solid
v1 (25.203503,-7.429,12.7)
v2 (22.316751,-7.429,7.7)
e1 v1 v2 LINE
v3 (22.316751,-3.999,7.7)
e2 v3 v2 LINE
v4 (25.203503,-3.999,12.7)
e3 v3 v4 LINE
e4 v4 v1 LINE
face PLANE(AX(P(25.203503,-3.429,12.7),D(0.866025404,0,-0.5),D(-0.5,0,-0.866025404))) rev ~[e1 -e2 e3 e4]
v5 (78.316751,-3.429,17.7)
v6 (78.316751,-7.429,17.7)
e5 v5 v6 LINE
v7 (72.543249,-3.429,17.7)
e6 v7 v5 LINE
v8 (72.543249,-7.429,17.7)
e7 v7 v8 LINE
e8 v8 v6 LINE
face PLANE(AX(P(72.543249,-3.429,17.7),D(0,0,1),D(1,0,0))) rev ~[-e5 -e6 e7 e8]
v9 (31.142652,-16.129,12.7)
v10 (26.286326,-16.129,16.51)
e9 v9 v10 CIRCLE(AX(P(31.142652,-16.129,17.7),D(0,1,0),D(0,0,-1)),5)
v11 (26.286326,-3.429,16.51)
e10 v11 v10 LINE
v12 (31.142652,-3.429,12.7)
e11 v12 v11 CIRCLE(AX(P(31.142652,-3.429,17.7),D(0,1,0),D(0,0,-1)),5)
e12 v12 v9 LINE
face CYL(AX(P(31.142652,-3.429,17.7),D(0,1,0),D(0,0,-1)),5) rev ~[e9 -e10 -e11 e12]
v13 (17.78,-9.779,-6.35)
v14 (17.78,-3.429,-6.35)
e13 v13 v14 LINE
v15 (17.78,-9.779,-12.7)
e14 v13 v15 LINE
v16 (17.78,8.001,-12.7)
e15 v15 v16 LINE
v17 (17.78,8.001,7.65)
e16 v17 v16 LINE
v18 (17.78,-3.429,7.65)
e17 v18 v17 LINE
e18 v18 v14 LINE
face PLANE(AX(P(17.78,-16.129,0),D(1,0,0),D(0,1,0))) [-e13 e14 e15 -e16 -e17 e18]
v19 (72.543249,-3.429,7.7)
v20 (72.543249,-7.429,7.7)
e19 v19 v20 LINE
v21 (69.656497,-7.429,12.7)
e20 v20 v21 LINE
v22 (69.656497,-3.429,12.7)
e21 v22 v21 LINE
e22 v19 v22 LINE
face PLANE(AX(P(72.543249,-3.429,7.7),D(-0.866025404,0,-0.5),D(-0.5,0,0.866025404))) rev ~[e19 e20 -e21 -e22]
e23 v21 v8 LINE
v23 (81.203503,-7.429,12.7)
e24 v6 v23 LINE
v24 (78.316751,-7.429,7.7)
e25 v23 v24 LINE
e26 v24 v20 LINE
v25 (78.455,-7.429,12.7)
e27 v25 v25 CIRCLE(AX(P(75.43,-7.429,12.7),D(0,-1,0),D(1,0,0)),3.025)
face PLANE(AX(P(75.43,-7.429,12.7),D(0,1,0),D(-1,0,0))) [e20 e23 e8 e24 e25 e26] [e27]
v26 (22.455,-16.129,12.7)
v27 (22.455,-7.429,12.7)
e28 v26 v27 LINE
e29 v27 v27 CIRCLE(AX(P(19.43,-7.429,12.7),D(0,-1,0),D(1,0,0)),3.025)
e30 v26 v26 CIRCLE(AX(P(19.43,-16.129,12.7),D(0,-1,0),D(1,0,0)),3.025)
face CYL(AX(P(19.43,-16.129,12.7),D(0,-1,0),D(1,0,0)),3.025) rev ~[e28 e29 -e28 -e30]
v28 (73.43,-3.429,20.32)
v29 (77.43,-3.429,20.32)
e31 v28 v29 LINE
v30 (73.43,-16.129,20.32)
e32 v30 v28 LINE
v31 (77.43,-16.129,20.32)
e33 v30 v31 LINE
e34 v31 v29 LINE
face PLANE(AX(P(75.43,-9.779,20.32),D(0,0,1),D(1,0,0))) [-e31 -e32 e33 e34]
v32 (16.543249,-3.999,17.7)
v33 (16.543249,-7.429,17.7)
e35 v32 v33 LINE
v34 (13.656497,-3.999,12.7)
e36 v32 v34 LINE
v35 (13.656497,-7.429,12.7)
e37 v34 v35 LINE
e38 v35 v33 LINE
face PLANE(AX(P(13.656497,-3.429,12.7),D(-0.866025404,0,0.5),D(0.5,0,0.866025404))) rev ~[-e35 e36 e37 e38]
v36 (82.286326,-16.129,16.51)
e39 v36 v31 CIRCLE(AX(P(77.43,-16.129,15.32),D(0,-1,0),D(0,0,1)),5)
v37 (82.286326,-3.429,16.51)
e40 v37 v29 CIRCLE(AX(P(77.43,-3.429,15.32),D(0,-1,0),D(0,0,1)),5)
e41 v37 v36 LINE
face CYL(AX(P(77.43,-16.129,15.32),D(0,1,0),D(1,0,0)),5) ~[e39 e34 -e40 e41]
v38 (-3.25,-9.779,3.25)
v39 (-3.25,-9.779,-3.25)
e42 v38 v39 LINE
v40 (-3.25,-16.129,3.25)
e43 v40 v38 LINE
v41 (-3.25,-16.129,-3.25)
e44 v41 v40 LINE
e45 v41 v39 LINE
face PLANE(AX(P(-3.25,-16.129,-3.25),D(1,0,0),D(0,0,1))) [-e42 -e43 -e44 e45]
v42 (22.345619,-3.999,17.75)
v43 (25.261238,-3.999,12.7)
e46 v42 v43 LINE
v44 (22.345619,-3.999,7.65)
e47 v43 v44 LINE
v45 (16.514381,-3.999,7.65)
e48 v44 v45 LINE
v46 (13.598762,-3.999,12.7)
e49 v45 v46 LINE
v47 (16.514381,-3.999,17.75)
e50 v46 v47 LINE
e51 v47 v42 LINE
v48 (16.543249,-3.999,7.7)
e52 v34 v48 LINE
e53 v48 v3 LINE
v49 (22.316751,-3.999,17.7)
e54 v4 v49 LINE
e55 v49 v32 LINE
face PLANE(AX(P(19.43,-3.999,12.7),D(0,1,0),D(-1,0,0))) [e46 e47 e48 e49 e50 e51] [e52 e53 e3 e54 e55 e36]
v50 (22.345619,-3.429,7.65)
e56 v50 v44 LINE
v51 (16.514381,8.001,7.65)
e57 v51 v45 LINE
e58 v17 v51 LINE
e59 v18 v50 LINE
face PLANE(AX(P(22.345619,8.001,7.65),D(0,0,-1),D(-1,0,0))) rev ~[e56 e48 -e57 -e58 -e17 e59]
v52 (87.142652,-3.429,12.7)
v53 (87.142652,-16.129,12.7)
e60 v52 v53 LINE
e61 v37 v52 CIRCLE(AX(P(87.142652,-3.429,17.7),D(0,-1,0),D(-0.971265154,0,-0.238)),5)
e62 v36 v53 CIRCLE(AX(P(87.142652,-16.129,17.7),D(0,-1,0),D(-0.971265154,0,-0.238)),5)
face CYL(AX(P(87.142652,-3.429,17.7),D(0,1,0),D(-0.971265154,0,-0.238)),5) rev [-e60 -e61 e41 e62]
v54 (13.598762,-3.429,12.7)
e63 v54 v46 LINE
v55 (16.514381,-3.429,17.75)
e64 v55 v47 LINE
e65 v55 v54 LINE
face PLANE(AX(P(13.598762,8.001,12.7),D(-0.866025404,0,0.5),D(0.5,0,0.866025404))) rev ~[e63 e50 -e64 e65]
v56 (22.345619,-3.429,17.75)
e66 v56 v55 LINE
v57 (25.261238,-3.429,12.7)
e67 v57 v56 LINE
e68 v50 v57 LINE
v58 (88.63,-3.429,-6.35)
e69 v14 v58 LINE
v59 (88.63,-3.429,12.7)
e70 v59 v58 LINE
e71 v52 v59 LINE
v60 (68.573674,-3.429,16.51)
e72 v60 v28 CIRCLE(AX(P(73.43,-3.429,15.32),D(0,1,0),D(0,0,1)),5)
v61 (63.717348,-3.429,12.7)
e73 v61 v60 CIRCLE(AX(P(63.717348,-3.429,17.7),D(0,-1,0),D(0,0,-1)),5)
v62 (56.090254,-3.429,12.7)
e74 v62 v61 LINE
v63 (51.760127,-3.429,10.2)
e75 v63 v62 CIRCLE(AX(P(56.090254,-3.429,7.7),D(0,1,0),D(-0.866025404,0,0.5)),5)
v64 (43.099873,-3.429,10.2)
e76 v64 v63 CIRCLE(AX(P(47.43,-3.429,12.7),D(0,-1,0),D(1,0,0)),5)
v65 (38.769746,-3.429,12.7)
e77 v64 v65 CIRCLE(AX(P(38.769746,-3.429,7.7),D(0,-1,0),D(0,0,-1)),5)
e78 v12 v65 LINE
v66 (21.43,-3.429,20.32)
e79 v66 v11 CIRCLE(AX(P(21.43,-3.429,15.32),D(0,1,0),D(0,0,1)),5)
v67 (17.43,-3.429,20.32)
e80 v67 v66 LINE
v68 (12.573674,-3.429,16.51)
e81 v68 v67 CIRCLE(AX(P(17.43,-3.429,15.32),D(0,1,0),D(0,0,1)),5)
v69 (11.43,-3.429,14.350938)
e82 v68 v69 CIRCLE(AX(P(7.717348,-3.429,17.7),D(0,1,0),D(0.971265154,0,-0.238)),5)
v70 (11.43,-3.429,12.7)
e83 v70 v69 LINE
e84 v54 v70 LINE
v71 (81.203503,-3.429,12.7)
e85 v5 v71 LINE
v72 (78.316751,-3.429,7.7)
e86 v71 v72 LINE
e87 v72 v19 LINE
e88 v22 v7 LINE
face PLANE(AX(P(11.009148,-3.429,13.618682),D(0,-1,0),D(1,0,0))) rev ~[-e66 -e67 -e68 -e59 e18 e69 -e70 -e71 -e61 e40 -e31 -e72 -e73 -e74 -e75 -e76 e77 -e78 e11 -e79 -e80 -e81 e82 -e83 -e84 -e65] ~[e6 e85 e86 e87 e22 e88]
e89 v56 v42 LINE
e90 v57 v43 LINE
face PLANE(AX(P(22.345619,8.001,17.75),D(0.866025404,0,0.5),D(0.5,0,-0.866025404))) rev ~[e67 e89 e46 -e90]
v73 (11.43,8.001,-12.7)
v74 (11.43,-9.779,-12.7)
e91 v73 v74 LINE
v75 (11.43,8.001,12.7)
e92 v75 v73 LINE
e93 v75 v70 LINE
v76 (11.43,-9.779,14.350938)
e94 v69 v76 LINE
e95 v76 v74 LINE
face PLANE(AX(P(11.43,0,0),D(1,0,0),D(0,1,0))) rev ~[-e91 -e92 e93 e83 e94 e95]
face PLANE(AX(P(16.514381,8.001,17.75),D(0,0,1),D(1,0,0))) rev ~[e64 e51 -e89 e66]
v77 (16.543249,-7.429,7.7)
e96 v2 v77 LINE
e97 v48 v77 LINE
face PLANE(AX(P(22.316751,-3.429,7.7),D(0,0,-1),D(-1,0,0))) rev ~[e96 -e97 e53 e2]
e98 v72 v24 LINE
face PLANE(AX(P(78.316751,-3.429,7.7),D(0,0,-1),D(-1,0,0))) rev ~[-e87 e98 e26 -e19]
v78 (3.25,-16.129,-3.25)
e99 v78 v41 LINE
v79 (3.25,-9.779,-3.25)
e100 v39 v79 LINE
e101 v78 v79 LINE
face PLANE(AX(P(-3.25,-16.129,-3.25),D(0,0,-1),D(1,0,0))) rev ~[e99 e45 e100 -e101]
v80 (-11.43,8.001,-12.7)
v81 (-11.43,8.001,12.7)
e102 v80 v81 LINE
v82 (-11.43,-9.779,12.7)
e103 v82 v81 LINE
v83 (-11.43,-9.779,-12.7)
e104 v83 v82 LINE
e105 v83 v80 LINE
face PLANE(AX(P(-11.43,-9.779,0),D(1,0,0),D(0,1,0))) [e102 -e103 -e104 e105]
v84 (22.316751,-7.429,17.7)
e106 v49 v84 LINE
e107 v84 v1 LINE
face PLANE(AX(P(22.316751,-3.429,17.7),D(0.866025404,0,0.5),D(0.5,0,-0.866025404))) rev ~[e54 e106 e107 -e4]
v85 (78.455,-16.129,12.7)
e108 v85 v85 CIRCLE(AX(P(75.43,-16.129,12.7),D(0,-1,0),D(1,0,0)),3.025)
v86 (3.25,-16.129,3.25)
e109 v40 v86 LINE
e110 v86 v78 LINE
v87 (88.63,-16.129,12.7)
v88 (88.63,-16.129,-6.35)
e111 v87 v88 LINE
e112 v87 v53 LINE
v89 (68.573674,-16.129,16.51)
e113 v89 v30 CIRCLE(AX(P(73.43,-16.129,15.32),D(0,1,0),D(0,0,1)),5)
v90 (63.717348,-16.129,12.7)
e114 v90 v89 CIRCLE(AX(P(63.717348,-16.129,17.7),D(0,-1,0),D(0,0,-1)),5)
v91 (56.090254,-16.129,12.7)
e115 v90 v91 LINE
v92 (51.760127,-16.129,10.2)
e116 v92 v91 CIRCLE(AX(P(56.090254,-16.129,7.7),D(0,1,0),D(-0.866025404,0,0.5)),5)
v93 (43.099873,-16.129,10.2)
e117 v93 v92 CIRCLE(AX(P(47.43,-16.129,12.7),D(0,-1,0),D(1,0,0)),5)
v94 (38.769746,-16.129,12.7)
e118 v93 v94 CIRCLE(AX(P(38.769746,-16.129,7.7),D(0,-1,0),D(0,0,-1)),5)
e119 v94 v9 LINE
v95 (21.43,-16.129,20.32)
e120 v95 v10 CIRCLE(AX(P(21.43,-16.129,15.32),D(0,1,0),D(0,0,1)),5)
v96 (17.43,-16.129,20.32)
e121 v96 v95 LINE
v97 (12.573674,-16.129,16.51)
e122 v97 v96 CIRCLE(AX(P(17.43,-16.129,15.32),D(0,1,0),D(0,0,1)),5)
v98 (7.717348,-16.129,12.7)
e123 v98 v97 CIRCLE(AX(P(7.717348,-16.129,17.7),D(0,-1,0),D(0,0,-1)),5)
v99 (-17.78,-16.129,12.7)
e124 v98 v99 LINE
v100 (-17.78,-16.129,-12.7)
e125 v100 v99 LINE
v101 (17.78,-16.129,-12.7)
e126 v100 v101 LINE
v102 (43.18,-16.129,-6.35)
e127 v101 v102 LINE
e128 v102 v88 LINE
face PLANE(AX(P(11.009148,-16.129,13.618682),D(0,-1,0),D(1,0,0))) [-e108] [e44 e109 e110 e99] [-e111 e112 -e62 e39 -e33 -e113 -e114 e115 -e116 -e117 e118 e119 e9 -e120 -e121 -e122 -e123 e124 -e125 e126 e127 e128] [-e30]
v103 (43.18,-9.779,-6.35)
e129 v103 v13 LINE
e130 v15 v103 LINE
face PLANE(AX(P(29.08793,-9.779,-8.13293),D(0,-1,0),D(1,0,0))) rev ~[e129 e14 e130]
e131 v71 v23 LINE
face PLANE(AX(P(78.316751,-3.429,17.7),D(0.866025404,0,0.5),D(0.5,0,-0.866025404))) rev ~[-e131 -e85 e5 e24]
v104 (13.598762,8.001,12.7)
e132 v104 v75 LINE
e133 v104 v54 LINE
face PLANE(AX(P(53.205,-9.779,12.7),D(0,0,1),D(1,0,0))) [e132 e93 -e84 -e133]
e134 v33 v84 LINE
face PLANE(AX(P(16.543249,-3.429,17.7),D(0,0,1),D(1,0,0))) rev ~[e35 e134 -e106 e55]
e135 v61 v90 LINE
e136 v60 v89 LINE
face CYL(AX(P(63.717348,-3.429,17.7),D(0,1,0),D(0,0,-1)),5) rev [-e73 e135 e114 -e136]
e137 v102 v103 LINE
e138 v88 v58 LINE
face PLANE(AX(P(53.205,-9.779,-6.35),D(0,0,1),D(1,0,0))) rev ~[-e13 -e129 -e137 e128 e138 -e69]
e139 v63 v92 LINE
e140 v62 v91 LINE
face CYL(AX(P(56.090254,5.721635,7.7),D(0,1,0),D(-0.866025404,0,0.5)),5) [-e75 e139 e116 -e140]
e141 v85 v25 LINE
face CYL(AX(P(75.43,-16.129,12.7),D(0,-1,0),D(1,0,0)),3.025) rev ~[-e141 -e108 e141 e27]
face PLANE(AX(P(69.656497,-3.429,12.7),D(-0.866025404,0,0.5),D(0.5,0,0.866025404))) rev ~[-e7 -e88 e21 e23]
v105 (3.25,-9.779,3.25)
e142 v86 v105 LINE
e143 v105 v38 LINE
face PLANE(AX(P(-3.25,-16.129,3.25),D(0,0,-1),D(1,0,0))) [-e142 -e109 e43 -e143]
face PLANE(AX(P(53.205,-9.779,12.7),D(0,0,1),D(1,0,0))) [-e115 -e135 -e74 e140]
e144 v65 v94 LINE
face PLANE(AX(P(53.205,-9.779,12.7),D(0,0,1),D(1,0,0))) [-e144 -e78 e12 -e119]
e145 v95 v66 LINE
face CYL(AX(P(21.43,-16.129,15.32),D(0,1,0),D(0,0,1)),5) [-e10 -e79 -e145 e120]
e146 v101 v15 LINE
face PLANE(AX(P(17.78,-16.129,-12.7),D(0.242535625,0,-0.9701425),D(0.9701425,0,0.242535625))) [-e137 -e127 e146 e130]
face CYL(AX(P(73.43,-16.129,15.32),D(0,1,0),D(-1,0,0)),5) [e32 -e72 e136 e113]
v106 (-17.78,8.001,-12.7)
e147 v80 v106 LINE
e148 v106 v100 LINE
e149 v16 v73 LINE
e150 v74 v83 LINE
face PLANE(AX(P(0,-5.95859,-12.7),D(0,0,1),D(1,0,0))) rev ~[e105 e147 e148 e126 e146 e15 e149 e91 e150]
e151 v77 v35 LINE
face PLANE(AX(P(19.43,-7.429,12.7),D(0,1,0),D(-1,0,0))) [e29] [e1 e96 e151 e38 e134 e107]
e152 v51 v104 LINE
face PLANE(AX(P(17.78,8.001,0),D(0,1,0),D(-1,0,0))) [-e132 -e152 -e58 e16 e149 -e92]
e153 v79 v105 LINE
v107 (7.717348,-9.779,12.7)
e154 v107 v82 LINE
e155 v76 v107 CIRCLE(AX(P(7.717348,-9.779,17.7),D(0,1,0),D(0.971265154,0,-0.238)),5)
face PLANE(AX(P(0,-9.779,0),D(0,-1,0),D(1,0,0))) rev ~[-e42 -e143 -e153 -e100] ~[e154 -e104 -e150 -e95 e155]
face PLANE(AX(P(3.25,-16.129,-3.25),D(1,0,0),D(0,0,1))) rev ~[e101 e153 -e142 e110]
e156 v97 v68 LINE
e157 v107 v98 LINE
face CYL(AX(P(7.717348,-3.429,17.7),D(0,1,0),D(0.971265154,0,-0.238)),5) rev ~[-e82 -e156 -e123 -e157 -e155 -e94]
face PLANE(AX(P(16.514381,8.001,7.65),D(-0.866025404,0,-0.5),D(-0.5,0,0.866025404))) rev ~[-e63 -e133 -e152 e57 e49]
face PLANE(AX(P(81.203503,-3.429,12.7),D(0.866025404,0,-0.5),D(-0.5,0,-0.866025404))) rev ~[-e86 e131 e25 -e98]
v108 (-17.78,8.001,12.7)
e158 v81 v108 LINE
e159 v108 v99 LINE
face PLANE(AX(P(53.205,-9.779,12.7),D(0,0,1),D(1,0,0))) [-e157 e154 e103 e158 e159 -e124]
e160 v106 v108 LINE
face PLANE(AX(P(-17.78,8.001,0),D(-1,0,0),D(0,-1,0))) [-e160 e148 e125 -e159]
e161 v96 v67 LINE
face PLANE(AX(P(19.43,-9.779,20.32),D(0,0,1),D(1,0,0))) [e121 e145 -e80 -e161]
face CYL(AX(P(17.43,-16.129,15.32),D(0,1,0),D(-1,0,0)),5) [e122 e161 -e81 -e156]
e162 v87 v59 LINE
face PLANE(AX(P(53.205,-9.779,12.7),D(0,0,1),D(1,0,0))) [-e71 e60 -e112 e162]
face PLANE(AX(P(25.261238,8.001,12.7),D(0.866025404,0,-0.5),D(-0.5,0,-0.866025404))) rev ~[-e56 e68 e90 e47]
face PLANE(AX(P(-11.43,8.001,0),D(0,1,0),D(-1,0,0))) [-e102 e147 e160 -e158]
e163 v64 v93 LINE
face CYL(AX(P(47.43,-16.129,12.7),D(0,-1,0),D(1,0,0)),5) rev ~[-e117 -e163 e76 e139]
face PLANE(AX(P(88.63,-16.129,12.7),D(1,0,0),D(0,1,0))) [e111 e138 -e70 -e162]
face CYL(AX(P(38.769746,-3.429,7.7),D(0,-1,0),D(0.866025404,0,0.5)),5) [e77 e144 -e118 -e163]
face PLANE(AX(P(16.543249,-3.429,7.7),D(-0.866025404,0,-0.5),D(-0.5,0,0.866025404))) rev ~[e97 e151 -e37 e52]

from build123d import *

# Parameters (mm, degrees)
F1_DEPTH      = 12.7
F2_R          = 3.25
F3_DEPTH      = 24.131
F4_W          = 6.5
F4_H          = 6.5
F5_DEPTH      = 7.62
F6_W          = 70.85
F6_H          = 12.7
F7_DEPTH      = 19.05
F9_DEPTH      = 6.35
F10_W         = 14
F10_H         = 12.7
F11_DEPTH     = 7.62
F12_R         = 5
F13_R         = 3.025
F14_DEPTH     = 24.131
F15_R         = 5
F16_DEPTH     = 24.131
F17_R         = 5
F19_DEPTH     = 4
F20_T1_DEPTH  = 12.7
F20_T6_DEPTH  = 12.7
F20_T12_DEPTH = 12.7
F20_T18_DEPTH = 12.7
F20_T21_DEPTH = 31.0012701892
F22_DEPTH     = 12


# Not quite as in the source:
# - a fillet or chamfer that OpenCascade refuses, or shapes differently, is made with other operations: its cross-section is extruded or revolved along the edge and cut away or added


with BuildPart() as f1:
    # F0 (on Top) → F1 (new body, symmetric)
    with BuildSketch(Plane.XY):
        Polygon((11.43, 8.001), (11.43, -9.779), (4.826, -9.779), (-7.366, -9.779), (-11.43, -9.779), (-11.43, 8.001), (-17.78, 8.001), (-17.78, -16.129), (17.78, -16.129), (17.78, 8.001), align=None)
    extrude(amount=F1_DEPTH, both=True)

    # F2 (on face) → F3 (cut, through all)
    with BuildSketch(Plane.XZ.offset(16.129)):
        Circle(F2_R)
    extrude(amount=-F3_DEPTH, mode=Mode.SUBTRACT)

    # F4 (on face) → F5 (cut)
    with BuildSketch(Plane.XZ.offset(16.129)):
        Rectangle(F4_W, F4_H)
    extrude(amount=-F5_DEPTH, mode=Mode.SUBTRACT)

    # F6 (on face) → F7 (join)
    with BuildSketch(Plane.XY.offset(12.7)):
        with Locations((53.205, -9.779)):
            Rectangle(F6_W, F6_H)
    extrude(amount=-F7_DEPTH)

    # F8 (on face) → F9 (join)
    with BuildSketch(Plane.XZ.offset(16.129)):
        Polygon((17.78, -6.35), (17.78, -12.7), (43.18, -6.35), align=None)
    extrude(amount=-F9_DEPTH)

    # F10 (on face) → F11 (join)
    with BuildSketch(Plane.XY.offset(12.7)):
        with Locations((19.43, -9.779)):
            Rectangle(F10_W, F10_H)
        with Locations((75.43, -9.779)):
            Rectangle(F10_W, F10_H)
    extrude(amount=F11_DEPTH)

    # F12
    f12_edges = [f1.edges().sort_by_distance(p)[0] for p in [
        (26.43, -9.779, 20.32),
        (12.43, -9.779, 20.32),
        (68.43, -9.779, 20.32),
        (82.43, -9.779, 20.32),
    ]]
    fillet(f12_edges, radius=F12_R)

    # F13 (on face) → F14 (cut, through all)
    with BuildSketch(Plane.XZ.offset(16.129)):
        with Locations((19.43, 12.7)):
            Circle(F13_R)
        with Locations((75.43, 12.7)):
            Circle(F13_R)
    extrude(amount=-F14_DEPTH, mode=Mode.SUBTRACT)

    # F15 (on face) → F16 (cut, through all)
    with BuildSketch(Plane.XZ.offset(16.129)):
        with Locations((47.43, 12.7)):
            Circle(F15_R)
    extrude(amount=-F16_DEPTH, mode=Mode.SUBTRACT)

    # F17
    f17_edges = [f1.edges().sort_by_distance(p)[0] for p in [
        (42.43, -9.779, 12.7),
    ]]
    fillet(f17_edges, radius=F17_R)

    # F18 (on face) → F19 (cut)
    with BuildSketch(Plane(origin=(0, -3.429, 0), x_dir=(-1, 0, 0), z_dir=(0, 1, 0))):
        Polygon((-69.6564973081, 12.7), (-72.5432486541, 17.7), (-78.3167513459, 17.7), (-81.2035026919, 12.7), (-78.3167513459, 7.7), (-72.5432486541, 7.7), align=None)
        Polygon((-25.2035026919, 12.7), (-22.3167513459, 7.7), (-16.5432486541, 7.7), (-13.6564973081, 12.7), (-16.5432486541, 17.7), (-22.3167513459, 17.7), align=None)
    extrude(amount=-F19_DEPTH, mode=Mode.SUBTRACT)

    # F20: fillet of radius 5 on 5 edges, made by hand

    # F20_s2 → F20_t1 (join)
    with BuildSketch(Plane.XZ.offset(3.429)):
        with BuildLine():
            ThreePointArc((82.2863257716, 16.51), (84.0563916708, 13.7661723474), (87.1426515432, 12.7))
            Line((87.1426515432, 12.7), (87.1426515432, 12.2))
            Line((87.1426515432, 12.2), (82.43, 12.2))
            Line((82.43, 12.2), (81.93, 12.7))
            ThreePointArc((81.93, 12.7), (81.93, 15.32), (81.8006931944, 16.391))
            Line((81.8006931944, 16.391), (82.2863257716, 16.51))
        make_face()
        with BuildLine():
            ThreePointArc((63.7173484568, 12.7), (66.8036083292, 13.7661723474), (68.5736742284, 16.51))
            Line((68.5736742284, 16.51), (69.0593068056, 16.391))
            ThreePointArc((69.0593068056, 16.391), (68.93, 15.32), (68.93, 12.7))
            Line((68.93, 12.7), (68.43, 12.2))
            Line((68.43, 12.2), (63.7173484568, 12.2))
            Line((63.7173484568, 12.2), (63.7173484568, 12.7))
        make_face()
        with BuildLine():
            ThreePointArc((31.1426515432, 12.7), (28.0563916708, 13.7661723474), (26.2863257716, 16.51))
            Line((26.2863257716, 16.51), (25.8006931944, 16.391))
            ThreePointArc((25.8006931944, 16.391), (25.93, 15.32), (25.93, 12.7))
            Line((25.93, 12.7), (26.43, 12.2))
            Line((26.43, 12.2), (31.1426515432, 12.2))
            Line((31.1426515432, 12.2), (31.1426515432, 12.7))
        make_face()
    extrude(amount=F20_T1_DEPTH)


with BuildPart() as f20_tool4:
    # F20_s5 → F20_t6 (new body)
    with BuildSketch(Plane.XZ.offset(3.429)):
        with BuildLine():
            ThreePointArc((12.5736742284, 16.51), (10.8036083292, 13.7661723474), (7.7173484568, 12.7))
            Line((7.7173484568, 12.7), (7.7173484568, 12.2))
            Line((7.7173484568, 12.2), (12.43, 12.2))
            Line((12.43, 12.2), (12.93, 12.7))
            ThreePointArc((12.93, 12.7), (12.93, 15.32), (13.0593068056, 16.391))
            Line((13.0593068056, 16.391), (12.5736742284, 16.51))
        make_face()
    extrude(amount=F20_T6_DEPTH)

    split(bisect_by=Plane.XZ.offset(9.779), keep=Keep.BOTTOM)

    split(bisect_by=Plane.YZ.offset(11.43), keep=Keep.TOP)


with BuildPart() as f1_1:
    add(f1.part)

    # F20_t3: union F20_tool4
    add(f20_tool4.part)


with BuildPart() as f20_tool10:
    # F20_s11 → F20_t12 (new body)
    with BuildSketch(Plane.XZ.offset(3.429)):
        with BuildLine():
            ThreePointArc((12.5736742284, 16.51), (10.8036083292, 13.7661723474), (7.7173484568, 12.7))
            Line((7.7173484568, 12.7), (7.7173484568, 12.2))
            Line((7.7173484568, 12.2), (12.43, 12.2))
            Line((12.43, 12.2), (12.93, 12.7))
            ThreePointArc((12.93, 12.7), (12.93, 15.32), (13.0593068056, 16.391))
            Line((13.0593068056, 16.391), (12.5736742284, 16.51))
        make_face()
    extrude(amount=F20_T12_DEPTH)

    split(bisect_by=Plane.XZ.offset(9.779), keep=Keep.TOP)

    split(bisect_by=Plane.YZ.offset(11.43), keep=Keep.TOP)


with BuildPart() as f1_2:
    add(f1_1.part)

    # F20_t9: union F20_tool10
    add(f20_tool10.part)


with BuildPart() as f20_tool16:
    # F20_s17 → F20_t18 (new body)
    with BuildSketch(Plane.XZ.offset(3.429)):
        with BuildLine():
            ThreePointArc((12.5736742284, 16.51), (10.8036083292, 13.7661723474), (7.7173484568, 12.7))
            Line((7.7173484568, 12.7), (7.7173484568, 12.2))
            Line((7.7173484568, 12.2), (12.43, 12.2))
            Line((12.43, 12.2), (12.93, 12.7))
            ThreePointArc((12.93, 12.7), (12.93, 15.32), (13.0593068056, 16.391))
            Line((13.0593068056, 16.391), (12.5736742284, 16.51))
        make_face()
    extrude(amount=F20_T18_DEPTH)

    split(bisect_by=Plane.XZ.offset(9.779), keep=Keep.TOP)

    split(bisect_by=Plane.YZ.offset(11.43), keep=Keep.BOTTOM)


with BuildPart() as f1_3:
    add(f1_2.part)

    # F20_t15: union F20_tool16
    add(f20_tool16.part)

    # F20_s22 → F20_t21 (cut)
    with BuildSketch(Plane.XZ.offset(-5.7216350946)):
        with BuildLine():
            ThreePointArc((51.7601270189, 10.2), (53.5902540378, 12.0301270189), (56.0902540378, 12.7))
            Line((56.0902540378, 12.7), (52.43, 12.7))
            ThreePointArc((52.43, 12.7), (52.2596291314, 11.4059047745), (51.7601270189, 10.2))
        make_face()
    extrude(amount=F20_T21_DEPTH, mode=Mode.SUBTRACT)

    # F21 (on face) → F22 (cut)
    with BuildSketch(Plane(origin=(0, 8.001, 0), x_dir=(-1, 0, 0), z_dir=(0, 1, 0))):
        Polygon((-22.3456188594, 7.65), (-16.5143811406, 7.65), (-13.5987622812, 12.7), (-16.5143811406, 17.75), (-22.3456188594, 17.75), (-25.2612377188, 12.7), align=None)
    extrude(amount=-F22_DEPTH, mode=Mode.SUBTRACT)


solid = f1_3.part
